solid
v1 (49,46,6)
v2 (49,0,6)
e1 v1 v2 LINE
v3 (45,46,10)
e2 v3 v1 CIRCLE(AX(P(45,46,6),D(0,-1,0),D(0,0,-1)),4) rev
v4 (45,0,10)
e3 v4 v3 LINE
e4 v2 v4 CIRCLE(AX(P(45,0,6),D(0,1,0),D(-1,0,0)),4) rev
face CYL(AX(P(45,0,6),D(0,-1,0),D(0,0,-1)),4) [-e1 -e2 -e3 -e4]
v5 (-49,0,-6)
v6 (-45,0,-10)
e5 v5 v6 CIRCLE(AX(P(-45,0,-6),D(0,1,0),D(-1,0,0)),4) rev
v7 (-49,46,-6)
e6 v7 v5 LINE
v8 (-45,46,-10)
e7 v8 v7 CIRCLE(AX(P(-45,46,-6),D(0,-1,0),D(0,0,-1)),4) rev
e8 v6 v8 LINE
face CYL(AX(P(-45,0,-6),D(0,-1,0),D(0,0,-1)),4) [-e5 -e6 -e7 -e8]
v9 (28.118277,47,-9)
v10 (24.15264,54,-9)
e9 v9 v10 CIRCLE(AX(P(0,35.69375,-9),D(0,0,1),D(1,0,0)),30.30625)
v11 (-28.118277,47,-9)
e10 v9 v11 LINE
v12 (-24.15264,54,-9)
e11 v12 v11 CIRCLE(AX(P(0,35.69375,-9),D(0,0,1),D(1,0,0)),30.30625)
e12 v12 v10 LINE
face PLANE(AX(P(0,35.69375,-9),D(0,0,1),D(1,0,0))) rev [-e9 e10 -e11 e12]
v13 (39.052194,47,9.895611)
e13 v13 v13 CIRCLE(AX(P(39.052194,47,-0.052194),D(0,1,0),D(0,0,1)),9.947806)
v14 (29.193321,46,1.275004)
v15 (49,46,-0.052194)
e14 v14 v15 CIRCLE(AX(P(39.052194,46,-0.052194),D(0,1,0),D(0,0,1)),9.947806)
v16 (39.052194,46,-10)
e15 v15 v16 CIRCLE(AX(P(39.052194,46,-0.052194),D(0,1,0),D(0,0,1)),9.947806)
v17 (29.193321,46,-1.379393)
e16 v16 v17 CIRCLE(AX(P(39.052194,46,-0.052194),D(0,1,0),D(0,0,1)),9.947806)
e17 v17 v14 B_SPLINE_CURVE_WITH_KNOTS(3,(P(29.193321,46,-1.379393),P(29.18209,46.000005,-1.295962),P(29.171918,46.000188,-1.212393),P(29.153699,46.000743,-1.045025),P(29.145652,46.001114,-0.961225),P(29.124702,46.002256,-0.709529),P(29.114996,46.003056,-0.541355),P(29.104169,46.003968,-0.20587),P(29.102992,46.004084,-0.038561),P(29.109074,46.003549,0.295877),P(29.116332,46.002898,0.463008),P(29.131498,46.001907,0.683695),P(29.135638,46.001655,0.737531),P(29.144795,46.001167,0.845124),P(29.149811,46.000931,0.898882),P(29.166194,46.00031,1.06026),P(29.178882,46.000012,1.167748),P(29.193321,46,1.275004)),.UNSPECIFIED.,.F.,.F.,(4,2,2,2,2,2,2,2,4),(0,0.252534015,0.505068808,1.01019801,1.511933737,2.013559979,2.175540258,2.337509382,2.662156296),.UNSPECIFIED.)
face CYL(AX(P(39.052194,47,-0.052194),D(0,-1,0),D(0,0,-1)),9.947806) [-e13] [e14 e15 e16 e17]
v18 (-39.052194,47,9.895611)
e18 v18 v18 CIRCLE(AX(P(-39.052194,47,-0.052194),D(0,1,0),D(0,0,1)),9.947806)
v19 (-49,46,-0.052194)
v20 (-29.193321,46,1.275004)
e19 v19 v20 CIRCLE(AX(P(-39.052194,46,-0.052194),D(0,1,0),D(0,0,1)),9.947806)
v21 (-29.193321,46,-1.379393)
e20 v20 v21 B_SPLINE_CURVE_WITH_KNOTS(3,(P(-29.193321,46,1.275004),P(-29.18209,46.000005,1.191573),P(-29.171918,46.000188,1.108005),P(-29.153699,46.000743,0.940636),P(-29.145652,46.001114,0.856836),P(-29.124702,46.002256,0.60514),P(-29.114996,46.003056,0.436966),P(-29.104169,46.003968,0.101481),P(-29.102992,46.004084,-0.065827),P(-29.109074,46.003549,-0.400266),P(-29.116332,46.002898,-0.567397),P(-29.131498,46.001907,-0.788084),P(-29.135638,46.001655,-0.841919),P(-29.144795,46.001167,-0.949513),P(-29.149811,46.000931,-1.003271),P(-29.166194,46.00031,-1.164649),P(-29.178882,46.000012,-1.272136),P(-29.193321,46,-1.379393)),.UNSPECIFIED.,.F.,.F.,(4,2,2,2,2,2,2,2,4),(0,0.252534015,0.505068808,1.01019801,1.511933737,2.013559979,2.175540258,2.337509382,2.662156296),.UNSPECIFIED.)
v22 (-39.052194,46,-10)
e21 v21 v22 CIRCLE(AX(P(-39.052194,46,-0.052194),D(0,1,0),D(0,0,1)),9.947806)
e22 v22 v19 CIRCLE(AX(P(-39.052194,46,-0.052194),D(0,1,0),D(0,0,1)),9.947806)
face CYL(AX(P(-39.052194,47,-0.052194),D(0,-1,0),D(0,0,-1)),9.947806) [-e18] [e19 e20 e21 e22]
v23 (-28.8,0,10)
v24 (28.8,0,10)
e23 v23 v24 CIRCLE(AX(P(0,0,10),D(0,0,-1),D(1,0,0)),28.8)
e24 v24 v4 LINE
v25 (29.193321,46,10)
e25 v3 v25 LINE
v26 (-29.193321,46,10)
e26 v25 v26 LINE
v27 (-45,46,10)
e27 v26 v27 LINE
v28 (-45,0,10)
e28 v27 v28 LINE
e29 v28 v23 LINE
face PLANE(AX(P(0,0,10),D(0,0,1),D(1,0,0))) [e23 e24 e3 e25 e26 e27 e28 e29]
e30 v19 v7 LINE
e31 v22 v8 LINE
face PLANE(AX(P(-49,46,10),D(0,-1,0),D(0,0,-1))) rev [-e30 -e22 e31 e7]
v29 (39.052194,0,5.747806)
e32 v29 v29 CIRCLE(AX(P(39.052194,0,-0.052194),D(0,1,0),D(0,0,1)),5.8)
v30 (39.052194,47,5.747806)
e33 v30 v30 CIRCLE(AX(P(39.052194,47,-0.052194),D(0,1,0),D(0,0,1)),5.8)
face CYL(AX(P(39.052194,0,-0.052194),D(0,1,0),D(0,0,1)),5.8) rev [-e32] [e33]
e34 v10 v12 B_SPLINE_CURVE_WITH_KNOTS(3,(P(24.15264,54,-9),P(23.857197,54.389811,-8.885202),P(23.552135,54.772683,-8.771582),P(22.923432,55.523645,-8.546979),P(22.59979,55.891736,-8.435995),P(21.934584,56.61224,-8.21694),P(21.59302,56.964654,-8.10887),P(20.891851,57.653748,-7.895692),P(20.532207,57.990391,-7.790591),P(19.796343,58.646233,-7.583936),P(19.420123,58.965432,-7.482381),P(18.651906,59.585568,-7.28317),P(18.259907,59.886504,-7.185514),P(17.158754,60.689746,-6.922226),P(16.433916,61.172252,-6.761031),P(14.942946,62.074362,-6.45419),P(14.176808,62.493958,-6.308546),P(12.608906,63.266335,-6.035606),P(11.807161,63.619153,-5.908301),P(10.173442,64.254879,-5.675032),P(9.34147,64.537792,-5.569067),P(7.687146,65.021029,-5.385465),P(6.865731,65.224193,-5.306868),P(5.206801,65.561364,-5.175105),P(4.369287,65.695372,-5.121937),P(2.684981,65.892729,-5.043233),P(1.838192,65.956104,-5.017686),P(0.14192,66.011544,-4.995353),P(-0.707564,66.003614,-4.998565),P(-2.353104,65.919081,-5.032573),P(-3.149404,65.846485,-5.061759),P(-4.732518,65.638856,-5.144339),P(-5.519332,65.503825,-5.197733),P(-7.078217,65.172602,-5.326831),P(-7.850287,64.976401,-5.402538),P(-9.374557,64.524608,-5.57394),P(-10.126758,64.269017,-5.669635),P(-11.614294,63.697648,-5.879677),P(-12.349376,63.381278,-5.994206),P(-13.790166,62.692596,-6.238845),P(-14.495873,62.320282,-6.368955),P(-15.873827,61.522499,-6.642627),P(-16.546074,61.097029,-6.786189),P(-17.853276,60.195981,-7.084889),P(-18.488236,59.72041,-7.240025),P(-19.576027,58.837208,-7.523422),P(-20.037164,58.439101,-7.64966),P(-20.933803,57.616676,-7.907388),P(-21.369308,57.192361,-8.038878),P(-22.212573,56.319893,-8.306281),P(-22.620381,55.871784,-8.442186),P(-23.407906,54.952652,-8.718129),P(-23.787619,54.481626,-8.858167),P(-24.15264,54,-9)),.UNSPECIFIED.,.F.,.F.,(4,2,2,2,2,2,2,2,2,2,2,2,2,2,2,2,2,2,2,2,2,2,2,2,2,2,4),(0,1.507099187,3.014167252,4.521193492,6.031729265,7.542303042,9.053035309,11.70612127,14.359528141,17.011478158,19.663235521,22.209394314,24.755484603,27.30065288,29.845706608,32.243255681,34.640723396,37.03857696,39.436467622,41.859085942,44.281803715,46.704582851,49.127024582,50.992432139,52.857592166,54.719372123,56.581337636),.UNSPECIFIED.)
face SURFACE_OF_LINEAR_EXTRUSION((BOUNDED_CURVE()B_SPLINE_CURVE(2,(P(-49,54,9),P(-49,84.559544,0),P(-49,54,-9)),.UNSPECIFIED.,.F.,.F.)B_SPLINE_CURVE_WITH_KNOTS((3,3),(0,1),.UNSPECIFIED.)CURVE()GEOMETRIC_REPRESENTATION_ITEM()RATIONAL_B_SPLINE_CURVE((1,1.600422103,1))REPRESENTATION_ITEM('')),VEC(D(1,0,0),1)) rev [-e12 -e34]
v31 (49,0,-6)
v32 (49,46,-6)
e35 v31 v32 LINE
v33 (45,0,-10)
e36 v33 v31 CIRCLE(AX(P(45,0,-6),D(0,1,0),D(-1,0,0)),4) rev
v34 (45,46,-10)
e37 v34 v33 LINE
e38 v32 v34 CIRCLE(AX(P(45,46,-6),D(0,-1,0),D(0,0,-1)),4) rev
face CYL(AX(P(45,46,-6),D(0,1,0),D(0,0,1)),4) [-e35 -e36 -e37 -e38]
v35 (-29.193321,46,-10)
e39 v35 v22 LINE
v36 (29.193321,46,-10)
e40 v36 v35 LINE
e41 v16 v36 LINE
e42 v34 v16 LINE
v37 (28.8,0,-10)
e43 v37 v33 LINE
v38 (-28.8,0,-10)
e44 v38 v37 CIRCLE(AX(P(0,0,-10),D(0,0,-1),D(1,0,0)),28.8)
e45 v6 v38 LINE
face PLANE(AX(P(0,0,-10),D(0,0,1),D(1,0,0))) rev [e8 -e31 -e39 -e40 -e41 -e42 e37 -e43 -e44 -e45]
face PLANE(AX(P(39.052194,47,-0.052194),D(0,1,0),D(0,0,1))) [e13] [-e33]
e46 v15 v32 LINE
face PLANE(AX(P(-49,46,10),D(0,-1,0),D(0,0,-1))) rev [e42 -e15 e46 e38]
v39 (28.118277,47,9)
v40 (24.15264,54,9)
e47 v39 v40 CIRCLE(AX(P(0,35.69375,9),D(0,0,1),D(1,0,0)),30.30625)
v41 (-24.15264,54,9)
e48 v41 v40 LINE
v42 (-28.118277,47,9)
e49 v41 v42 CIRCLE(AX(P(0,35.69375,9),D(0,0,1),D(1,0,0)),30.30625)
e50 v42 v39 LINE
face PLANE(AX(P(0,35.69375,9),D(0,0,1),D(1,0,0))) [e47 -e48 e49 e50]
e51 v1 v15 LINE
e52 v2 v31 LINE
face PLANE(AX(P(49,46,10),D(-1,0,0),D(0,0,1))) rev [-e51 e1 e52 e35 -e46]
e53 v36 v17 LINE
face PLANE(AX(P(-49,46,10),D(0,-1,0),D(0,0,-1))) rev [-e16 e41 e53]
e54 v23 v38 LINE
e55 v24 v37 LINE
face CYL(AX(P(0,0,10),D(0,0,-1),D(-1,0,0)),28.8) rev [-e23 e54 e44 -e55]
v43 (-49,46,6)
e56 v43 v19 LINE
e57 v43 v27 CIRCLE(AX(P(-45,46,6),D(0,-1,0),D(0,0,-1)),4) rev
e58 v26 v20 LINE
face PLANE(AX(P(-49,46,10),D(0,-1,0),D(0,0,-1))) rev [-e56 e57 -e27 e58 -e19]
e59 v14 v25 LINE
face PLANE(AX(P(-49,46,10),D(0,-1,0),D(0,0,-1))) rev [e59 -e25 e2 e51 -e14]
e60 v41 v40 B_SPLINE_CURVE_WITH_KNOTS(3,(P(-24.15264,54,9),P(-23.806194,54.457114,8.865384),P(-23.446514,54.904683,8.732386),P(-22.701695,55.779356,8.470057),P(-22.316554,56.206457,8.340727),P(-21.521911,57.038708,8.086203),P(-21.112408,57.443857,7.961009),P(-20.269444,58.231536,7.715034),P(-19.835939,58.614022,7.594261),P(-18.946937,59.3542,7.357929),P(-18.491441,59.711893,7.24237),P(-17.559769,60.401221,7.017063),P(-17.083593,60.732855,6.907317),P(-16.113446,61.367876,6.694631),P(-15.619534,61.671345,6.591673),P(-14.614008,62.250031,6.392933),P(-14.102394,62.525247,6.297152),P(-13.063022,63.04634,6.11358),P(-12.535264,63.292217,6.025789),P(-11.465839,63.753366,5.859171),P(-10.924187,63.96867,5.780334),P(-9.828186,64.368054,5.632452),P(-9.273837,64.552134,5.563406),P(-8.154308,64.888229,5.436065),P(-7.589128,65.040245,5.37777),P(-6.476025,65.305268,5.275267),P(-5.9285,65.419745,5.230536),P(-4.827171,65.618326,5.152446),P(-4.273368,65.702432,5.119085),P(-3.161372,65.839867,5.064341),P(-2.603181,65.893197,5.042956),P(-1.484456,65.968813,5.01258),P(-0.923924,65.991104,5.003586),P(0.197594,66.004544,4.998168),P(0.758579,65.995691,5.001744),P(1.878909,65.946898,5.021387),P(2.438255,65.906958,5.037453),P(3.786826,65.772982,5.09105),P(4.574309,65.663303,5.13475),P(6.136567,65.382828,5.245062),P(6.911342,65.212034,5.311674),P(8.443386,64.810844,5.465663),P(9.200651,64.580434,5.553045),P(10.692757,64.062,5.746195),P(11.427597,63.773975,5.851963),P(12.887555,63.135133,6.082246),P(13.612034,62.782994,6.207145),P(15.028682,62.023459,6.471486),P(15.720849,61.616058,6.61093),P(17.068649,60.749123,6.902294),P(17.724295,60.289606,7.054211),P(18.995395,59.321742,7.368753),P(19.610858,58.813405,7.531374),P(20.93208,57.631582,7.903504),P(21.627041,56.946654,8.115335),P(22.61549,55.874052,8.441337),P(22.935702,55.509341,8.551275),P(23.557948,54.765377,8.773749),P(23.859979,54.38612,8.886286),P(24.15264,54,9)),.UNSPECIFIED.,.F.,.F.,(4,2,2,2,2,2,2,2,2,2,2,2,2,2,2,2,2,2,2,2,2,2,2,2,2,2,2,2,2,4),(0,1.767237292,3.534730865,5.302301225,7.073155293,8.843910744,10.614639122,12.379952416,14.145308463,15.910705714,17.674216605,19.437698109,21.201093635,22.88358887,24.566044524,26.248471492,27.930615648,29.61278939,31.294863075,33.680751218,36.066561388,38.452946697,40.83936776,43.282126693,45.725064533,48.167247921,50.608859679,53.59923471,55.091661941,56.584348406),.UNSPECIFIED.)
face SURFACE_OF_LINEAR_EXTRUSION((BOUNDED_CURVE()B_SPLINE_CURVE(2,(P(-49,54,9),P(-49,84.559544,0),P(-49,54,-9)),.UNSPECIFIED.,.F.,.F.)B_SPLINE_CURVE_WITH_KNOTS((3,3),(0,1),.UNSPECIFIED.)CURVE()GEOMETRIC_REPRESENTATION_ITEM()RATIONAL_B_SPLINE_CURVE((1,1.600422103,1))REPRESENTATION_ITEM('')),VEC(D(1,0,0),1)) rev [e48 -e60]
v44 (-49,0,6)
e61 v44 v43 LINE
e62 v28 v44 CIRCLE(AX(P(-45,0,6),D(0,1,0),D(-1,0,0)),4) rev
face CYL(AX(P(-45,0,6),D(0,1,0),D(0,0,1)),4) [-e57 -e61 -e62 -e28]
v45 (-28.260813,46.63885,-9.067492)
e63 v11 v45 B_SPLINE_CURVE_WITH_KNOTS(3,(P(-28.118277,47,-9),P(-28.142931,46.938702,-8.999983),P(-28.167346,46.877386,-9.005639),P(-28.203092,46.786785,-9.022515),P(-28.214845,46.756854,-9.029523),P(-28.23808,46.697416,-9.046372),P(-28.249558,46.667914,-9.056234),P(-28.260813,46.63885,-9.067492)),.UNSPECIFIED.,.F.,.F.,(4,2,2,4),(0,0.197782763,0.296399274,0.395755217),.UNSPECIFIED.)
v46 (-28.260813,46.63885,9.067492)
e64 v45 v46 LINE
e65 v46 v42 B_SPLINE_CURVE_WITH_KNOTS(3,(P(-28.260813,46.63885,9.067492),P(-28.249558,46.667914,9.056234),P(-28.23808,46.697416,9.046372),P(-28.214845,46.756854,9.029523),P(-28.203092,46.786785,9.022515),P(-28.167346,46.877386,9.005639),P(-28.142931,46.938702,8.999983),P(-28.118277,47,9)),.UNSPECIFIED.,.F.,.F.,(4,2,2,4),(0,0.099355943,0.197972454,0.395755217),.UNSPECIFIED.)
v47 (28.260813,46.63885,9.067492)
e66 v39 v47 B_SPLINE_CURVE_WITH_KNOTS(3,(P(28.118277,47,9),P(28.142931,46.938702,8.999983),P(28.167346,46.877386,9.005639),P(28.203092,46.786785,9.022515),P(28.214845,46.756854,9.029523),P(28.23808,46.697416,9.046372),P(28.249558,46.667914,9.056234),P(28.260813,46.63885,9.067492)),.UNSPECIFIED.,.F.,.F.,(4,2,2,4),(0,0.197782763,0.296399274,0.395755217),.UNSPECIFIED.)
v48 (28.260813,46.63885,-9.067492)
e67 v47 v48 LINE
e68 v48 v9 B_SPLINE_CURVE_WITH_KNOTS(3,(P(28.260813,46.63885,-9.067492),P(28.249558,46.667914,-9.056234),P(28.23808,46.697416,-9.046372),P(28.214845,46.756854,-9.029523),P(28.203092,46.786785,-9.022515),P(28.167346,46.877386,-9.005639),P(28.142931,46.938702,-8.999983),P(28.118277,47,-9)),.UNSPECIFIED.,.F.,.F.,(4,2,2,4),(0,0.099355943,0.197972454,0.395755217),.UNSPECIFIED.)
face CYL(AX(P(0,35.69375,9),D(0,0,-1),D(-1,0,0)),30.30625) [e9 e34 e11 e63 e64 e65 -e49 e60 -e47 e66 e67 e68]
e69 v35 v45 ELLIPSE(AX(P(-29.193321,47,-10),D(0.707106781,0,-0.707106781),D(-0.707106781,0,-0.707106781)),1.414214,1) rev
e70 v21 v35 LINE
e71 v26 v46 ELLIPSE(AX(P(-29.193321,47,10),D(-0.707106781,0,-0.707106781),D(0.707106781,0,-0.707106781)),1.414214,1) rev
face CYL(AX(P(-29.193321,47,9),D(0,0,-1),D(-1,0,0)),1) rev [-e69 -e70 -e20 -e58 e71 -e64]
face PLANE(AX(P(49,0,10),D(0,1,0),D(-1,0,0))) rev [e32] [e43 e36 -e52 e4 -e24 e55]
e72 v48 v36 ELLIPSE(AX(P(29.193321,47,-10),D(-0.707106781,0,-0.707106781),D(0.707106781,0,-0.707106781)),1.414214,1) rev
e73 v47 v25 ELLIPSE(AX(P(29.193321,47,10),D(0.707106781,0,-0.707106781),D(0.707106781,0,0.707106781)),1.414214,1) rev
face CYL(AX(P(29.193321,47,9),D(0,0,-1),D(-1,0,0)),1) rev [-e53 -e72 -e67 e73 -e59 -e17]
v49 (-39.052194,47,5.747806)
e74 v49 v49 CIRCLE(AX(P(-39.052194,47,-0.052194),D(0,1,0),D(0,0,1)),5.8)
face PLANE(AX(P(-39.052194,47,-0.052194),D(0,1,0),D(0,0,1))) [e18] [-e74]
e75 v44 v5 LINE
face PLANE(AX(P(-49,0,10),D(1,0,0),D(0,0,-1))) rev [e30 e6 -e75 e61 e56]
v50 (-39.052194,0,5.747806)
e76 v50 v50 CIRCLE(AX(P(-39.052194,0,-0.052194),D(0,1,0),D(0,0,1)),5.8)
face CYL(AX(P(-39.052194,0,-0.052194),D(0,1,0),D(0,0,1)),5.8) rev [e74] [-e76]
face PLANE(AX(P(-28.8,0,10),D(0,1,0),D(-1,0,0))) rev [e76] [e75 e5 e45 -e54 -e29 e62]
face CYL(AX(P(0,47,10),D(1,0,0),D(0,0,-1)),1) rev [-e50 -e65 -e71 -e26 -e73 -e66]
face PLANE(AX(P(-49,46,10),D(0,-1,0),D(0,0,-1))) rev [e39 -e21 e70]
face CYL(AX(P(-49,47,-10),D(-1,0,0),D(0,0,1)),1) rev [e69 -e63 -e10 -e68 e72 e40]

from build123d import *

# Parameters (mm, degrees)
SALIENTE_EXTRUIR2_DEPTH    = 10
CROQUIS3_R                 = 9.947805623
SALIENTE_EXTRUIR3_DEPTH    = 1
CORTAR_EXTRUIR1_DEPTH      = 68.948509917
CORTAR_EXTRUIR1_DEPTH_BACK = 68.948509917
CROQUIS4_R                 = 5.8
SALIENTE_EXTRUIR4_DEPTH    = 9
CORTAR_EXTRUIR2_DEPTH      = 83.807004535
CORTAR_EXTRUIR2_DEPTH_BACK = 83.807004535
REDONDEO3_START            = -10.0000001
REDONDEO3_DEPTH            = 1.0000001
REDONDEO3_START_2          = 9
REDONDEO3_2_DEPTH          = 1
REDONDEO3_START_3          = -9
REDONDEO3_3_DEPTH          = 18
REDONDEO3_START_4          = -29.193321254
REDONDEO3_4_DEPTH          = 58.386642508
REDONDEO4_R                = 4


with BuildPart() as part:
    # Croquis2 → Saliente-Extruir2 (new, symmetric)
    with BuildSketch(Plane.XY):
        with BuildLine():
            Line((-49, 0), (-49, 46))
            Line((-49, 46), (49, 46))
            Line((49, 46), (49, 0))
            Line((49, 0), (28.8, 0))
            ThreePointArc((28.8, 0), (0, 28.8), (-28.8, 0))
            Line((-28.8, 0), (-49, 0))
        make_face()
    extrude(amount=SALIENTE_EXTRUIR2_DEPTH, both=True)

    # Croquis3 → Saliente-Extruir3 (add)
    with BuildSketch(Plane(origin=(0, 46, 0), x_dir=(1, 0, 0), z_dir=(0, 1, 0))):
        with Locations(Location((-39.052194377, 0.052194377, 0), (0, 0, 90))):
            Circle(CROQUIS3_R)
        with Locations(Location((39.052194377, 0.052194377, 0), (0, 0, 90))):
            Circle(CROQUIS3_R)
    extrude(amount=SALIENTE_EXTRUIR3_DEPTH)

    # Croquis4 → Cortar-Extruir1 (cut, two sides: drawn at the far end of the back side and taken through both)
    with BuildSketch(Plane(origin=(0, 46, 0), x_dir=(1, 0, 0), z_dir=(0, 1, 0)).offset(-CORTAR_EXTRUIR1_DEPTH_BACK)):
        with Locations(Location((-39.052194377, 0.052194377, 0), (0, 0, 270))):
            Circle(CROQUIS4_R)
        with Locations(Location((39.052194377, 0.052194377, 0), (0, 0, 270))):
            Circle(CROQUIS4_R)
    extrude(amount=CORTAR_EXTRUIR1_DEPTH + CORTAR_EXTRUIR1_DEPTH_BACK, mode=Mode.SUBTRACT)

    # Croquis5 → Saliente-Extruir4 (add, symmetric)
    with BuildSketch(Plane.XY):
        with BuildLine():
            Line((-28.5, 46), (28.5, 46))
            ThreePointArc((28.5, 46), (0, 66), (-28.5, 46))
        make_face()
    extrude(amount=SALIENTE_EXTRUIR4_DEPTH, both=True)

    # Croquis6 → Cortar-Extruir2 (cut, two sides: drawn at the far end of the back side and taken through both)
    with BuildSketch(Plane(origin=(0, 0, 0), x_dir=(0, 0, -1), z_dir=(1, 0, 0)).offset(-CORTAR_EXTRUIR2_DEPTH_BACK)):
        with BuildLine():
            Line((-9, 66), (-9, 54))
            add(Edge.make_bspline(
                [(-9, 54), (-6.728088744, 61.714285714), (-5, 66)],
                knots=[0, 0, 0, 0.174230423, 0.174230423, 0.174230423], degree=2, weights=[1, 1.104611797, 1.172770478]))
            Line((-5, 66), (-9, 66))
        make_face()
        with BuildLine():
            add(Edge.make_bspline(
                [(5, 66), (6.728088744, 61.714285714), (9, 54)],
                knots=[0.825769577, 0.825769577, 0.825769577, 1, 1, 1], degree=2, weights=[1.172770478, 1.104611797, 1]))
            Line((9, 54), (9, 66))
            Line((9, 66), (5, 66))
        make_face()
    extrude(amount=CORTAR_EXTRUIR2_DEPTH + CORTAR_EXTRUIR2_DEPTH_BACK, mode=Mode.SUBTRACT)

    # Redondeo3: read off the stored shape, not the designer's step
    # Redondeo3 outline → Redondeo3 (add)
    with BuildSketch(Plane.XY.offset(REDONDEO3_START)):
        with BuildLine():
            Line((-29.193321154, 46), (29.193321154, 46))
            ThreePointArc((29.193321154, 46), (28.62814416, 46.175030325), (28.260813391, 46.63885007))
            ThreePointArc((28.260813391, 46.63885007), (0, 66), (-28.260813391, 46.63885007))
            ThreePointArc((-28.260813391, 46.63885007), (-28.62814416, 46.175030325), (-29.193321154, 46))
        make_face()
    extrude(amount=REDONDEO3_DEPTH)

    # Redondeo3 2 outline → Redondeo3 2 (add)
    with BuildSketch(Plane.XY.offset(REDONDEO3_START_2)):
        with BuildLine():
            Line((-29.193321154, 46), (29.193321154, 46))
            ThreePointArc((29.193321154, 46), (28.62814416, 46.175030325), (28.260813391, 46.63885007))
            ThreePointArc((28.260813391, 46.63885007), (0, 66), (-28.260813391, 46.63885007))
            ThreePointArc((-28.260813391, 46.63885007), (-28.62814416, 46.175030325), (-29.193321154, 46))
        make_face()
    extrude(amount=REDONDEO3_2_DEPTH)

    # Redondeo3 3 outline → Redondeo3 3 (add)
    with BuildSketch(Plane.XY.offset(REDONDEO3_START_3)):
        with BuildLine():
            ThreePointArc((-28.5, 46), (-28.382204223, 46.320098033), (-28.260813391, 46.63885007))
            ThreePointArc((-28.260813391, 46.63885007), (-28.62814416, 46.175030325), (-29.193321154, 46))
            Line((-29.193321154, 46), (-28.5, 46))
        make_face()
        with BuildLine():
            ThreePointArc((29.193321154, 46), (28.62814416, 46.175030325), (28.260813391, 46.63885007))
            ThreePointArc((28.260813391, 46.63885007), (28.382204223, 46.320098033), (28.5, 46))
            Line((28.5, 46), (29.193321154, 46))
        make_face()
    extrude(amount=REDONDEO3_3_DEPTH)

    # Redondeo3 4 outline → Redondeo3 4 (cut)
    with BuildSketch(Plane.YZ.offset(REDONDEO3_START_4)):
        with BuildLine():
            Line((47, 9), (67, 9))
            Line((67, 9), (67, 10))
            Line((67, 10), (46, 10))
            ThreePointArc((46, 10), (46.292893219, 9.292893219), (47, 9))
        make_face()
        with BuildLine():
            Line((67, -10), (67, -9))
            Line((67, -9), (47, -9))
            ThreePointArc((47, -9), (46.292893219, -9.292893219), (46, -10))
            Line((46, -10), (67, -10))
        make_face()
    extrude(amount=REDONDEO3_4_DEPTH, mode=Mode.SUBTRACT)

    # Redondeo4
    redondeo4_edges = [part.edges().sort_by_distance(p)[0] for p in [
        (49, 23, 10),
        (-49, 23, 10),
        (-49, 23, -10),
        (49, 23, -10),
    ]]
    fillet(redondeo4_edges, radius=REDONDEO4_R)


solid = part.part
